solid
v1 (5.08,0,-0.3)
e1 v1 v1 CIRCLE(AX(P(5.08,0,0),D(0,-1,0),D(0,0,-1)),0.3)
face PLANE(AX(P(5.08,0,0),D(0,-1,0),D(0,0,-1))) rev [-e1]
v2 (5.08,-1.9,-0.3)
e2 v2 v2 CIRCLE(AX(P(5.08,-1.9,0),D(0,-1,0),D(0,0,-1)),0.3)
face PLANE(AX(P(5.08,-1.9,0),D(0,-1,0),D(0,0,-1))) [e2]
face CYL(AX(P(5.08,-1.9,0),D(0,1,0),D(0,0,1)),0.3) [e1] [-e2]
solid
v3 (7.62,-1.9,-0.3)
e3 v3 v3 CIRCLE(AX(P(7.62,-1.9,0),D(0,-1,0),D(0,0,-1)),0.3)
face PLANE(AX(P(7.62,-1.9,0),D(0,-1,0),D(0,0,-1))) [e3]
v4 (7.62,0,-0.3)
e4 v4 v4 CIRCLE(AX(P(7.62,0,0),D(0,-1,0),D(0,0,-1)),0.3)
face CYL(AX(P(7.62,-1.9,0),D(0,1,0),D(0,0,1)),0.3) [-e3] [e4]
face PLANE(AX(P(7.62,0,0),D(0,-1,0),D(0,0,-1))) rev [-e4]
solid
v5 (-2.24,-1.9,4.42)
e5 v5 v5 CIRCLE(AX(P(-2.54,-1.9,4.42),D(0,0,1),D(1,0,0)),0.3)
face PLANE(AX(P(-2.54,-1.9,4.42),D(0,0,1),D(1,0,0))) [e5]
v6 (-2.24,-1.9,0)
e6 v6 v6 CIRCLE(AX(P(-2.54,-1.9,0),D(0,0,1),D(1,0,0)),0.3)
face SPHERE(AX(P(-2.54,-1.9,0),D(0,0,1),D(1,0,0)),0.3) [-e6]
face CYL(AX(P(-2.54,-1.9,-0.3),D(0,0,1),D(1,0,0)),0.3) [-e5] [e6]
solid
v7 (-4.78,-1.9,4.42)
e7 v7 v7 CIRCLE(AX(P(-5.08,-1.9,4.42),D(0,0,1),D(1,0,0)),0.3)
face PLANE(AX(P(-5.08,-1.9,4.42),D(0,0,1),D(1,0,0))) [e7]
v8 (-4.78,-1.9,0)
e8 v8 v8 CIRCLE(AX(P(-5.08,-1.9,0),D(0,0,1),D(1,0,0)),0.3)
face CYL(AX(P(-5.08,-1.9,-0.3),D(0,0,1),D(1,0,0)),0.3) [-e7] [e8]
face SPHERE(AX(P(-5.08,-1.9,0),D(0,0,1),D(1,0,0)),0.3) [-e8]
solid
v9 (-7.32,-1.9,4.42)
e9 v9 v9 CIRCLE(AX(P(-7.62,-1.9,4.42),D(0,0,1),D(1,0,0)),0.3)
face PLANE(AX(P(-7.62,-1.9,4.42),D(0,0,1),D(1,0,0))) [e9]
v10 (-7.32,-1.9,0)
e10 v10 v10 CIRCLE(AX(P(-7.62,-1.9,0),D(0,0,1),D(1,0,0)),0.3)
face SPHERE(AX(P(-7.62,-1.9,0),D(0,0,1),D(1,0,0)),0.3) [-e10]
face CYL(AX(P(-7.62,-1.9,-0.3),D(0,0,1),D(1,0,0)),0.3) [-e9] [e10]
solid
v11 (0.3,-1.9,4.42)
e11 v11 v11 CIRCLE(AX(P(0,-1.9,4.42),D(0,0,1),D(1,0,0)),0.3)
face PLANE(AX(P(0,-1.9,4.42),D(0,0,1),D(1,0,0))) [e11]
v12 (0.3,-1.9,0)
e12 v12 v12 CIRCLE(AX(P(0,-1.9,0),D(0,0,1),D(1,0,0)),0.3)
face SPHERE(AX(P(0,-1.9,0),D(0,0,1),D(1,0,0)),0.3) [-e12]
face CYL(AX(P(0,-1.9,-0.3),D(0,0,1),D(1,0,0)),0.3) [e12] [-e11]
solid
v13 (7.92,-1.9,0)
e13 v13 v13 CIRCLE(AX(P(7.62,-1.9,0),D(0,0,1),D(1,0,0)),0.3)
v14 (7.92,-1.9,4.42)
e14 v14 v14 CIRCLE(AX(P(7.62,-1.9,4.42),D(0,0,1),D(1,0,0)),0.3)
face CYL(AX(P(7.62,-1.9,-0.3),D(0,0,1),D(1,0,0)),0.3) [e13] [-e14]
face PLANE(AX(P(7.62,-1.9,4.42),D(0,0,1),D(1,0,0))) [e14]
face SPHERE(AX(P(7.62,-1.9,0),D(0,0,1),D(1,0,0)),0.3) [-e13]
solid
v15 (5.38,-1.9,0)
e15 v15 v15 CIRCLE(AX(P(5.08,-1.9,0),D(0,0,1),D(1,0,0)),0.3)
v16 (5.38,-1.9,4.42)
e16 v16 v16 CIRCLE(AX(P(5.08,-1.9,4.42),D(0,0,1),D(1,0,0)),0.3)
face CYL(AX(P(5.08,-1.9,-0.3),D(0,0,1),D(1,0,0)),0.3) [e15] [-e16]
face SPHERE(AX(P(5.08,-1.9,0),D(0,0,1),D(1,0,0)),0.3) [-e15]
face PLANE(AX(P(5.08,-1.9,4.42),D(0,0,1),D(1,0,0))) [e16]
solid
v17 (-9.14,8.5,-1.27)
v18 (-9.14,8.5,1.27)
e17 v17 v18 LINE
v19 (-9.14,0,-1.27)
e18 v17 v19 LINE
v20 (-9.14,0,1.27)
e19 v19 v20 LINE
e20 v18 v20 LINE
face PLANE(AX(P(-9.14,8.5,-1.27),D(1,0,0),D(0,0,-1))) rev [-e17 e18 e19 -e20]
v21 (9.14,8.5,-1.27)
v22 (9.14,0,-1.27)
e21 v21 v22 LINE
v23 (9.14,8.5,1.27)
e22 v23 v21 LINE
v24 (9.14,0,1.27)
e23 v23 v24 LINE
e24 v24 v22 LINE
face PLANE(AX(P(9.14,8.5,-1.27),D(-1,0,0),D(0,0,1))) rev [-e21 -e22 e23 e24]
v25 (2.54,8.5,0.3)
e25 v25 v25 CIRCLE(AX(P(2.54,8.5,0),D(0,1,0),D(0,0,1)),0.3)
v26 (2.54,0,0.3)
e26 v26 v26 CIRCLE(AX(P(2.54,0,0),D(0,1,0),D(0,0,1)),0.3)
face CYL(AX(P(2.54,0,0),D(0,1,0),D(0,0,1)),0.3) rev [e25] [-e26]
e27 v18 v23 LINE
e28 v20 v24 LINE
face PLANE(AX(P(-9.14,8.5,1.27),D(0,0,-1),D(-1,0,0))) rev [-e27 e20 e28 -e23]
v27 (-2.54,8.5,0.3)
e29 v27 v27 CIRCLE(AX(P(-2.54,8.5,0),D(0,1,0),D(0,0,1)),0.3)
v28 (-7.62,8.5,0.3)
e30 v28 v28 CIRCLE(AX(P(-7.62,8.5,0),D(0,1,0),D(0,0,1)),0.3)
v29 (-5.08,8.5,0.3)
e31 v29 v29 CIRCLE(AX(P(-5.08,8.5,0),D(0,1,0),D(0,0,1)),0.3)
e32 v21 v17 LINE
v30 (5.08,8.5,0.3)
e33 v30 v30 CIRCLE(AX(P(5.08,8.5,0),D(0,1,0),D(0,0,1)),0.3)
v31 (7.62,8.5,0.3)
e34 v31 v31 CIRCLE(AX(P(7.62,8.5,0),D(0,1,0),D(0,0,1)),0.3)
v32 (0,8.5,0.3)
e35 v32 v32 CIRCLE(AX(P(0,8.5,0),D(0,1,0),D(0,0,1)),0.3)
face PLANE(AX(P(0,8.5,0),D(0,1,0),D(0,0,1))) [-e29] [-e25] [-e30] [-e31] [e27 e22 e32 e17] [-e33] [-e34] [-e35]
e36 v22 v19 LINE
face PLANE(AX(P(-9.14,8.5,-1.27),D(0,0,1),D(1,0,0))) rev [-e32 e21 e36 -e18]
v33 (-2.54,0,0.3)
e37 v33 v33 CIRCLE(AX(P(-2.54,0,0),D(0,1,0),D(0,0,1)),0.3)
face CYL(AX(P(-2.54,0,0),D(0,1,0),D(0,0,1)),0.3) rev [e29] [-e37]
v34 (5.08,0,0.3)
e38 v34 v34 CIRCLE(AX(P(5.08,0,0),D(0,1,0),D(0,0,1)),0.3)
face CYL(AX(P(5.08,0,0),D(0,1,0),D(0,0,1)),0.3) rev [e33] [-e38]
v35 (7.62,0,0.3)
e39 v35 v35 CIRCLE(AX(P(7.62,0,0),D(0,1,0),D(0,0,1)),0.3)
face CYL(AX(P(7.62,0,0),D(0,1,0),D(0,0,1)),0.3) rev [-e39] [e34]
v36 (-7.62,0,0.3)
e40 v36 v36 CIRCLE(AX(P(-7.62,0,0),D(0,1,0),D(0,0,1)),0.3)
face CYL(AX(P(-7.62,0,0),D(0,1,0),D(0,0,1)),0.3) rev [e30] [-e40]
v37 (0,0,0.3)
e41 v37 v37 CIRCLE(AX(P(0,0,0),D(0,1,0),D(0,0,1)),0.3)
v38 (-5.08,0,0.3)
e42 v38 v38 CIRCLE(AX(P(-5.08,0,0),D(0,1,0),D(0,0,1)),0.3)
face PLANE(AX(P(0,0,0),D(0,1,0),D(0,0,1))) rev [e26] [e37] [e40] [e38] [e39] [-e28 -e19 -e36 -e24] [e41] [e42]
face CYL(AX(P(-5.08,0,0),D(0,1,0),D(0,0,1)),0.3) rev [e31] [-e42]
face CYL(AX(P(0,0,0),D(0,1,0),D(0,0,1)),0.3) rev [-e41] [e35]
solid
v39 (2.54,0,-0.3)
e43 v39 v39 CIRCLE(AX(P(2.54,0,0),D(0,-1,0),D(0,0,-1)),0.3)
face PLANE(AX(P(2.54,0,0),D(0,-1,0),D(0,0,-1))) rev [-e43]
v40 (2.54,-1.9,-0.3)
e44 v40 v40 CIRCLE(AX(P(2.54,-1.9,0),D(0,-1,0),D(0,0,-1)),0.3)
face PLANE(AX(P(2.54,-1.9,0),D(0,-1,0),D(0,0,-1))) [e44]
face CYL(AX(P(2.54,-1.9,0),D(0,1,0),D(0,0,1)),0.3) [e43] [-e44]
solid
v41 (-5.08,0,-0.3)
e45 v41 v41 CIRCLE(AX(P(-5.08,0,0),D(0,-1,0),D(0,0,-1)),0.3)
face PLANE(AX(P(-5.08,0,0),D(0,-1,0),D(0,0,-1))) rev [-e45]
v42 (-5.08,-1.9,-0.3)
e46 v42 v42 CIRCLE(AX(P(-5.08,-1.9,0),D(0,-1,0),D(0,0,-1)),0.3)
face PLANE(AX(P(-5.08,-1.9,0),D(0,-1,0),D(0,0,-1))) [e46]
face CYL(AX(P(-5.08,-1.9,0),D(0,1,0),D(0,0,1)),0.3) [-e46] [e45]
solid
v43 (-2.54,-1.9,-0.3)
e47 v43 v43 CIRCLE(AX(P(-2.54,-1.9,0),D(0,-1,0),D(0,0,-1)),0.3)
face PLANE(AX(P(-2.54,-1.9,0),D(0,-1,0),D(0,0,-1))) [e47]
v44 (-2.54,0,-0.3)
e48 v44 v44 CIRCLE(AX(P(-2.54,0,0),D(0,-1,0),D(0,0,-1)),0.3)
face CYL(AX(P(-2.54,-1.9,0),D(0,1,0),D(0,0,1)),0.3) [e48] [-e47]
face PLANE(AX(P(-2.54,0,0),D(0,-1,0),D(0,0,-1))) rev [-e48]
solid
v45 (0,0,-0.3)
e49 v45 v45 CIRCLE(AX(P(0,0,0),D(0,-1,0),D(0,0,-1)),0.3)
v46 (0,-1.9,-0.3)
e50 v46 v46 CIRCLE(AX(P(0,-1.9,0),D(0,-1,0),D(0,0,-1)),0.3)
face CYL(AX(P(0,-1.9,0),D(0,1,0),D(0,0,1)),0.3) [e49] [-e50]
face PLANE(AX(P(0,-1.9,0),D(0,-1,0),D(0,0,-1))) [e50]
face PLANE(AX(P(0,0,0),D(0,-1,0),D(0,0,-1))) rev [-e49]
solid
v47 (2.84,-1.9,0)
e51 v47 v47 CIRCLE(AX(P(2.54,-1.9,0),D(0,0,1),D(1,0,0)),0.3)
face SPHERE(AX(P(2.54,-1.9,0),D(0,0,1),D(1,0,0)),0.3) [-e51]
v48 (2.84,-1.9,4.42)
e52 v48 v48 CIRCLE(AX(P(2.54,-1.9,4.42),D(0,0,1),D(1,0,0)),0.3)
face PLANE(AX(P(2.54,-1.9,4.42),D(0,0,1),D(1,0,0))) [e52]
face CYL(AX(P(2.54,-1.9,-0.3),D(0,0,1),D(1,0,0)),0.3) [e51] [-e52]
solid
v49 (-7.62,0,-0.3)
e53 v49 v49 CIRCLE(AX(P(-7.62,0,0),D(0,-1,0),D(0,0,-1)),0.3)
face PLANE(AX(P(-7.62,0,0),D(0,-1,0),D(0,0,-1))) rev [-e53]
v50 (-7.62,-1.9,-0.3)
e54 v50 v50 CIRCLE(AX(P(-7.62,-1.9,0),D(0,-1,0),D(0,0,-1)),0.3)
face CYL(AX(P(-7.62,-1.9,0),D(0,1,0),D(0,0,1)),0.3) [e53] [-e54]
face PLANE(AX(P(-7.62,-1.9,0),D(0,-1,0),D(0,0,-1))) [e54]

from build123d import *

# Parameters (mm, degrees)
SKETCH_1_W             = 18.28
SKETCH_1_H             = 2.54
EXTRUDE_1_DEPTH        = 8.5
SKETCH_2_R             = 0.3
CUT_EXTRUDE_1_DEPTH    = 8.5
SKETCH_3_R             = 0.3
EXTRUDE_2_DEPTH        = 1.9
EXTRUDE_2_2_DEPTH      = 1.9
EXTRUDE_2_3_DEPTH      = 1.9
EXTRUDE_2_4_DEPTH      = 1.9
EXTRUDE_2_5_DEPTH      = 1.9
EXTRUDE_2_6_DEPTH      = 1.9
EXTRUDE_2_7_DEPTH      = 1.9
EXTRUDE_3_DEPTH        = 4.42
EXTRUDE_3_DEPTH_BACK   = 0.3
SKETCH_4_R             = 0.3
EXTRUDE_3_2_DEPTH      = 4.42
EXTRUDE_3_2_DEPTH_BACK = 0.3
EXTRUDE_3_3_DEPTH      = 4.42
EXTRUDE_3_3_DEPTH_BACK = 0.3
EXTRUDE_3_4_DEPTH      = 4.42
EXTRUDE_3_4_DEPTH_BACK = 0.3
EXTRUDE_3_5_DEPTH      = 4.42
EXTRUDE_3_5_DEPTH_BACK = 0.3
EXTRUDE_3_6_DEPTH      = 4.42
EXTRUDE_3_6_DEPTH_BACK = 0.3
EXTRUDE_3_7_DEPTH      = 4.42
EXTRUDE_3_7_DEPTH_BACK = 0.3
FILLET_2_R             = 0.3
FILLET_3_R             = 0.3
FILLET_4_R             = 0.3
FILLET_5_R             = 0.3
FILLET_6_R             = 0.3
FILLET_7_R             = 0.3
FILLET_8_R             = 0.3


with BuildPart() as part:
    # Эскиз1 → Бобышка-Вытянуть1 (new body)
    with BuildSketch(Plane(origin=(0, 0, 0), x_dir=(1, 0, 0), z_dir=(0, 1, 0))):
        Rectangle(SKETCH_1_W, SKETCH_1_H)
    extrude(amount=EXTRUDE_1_DEPTH)

    # Эскиз2 → Вырез-Вытянуть1 (cut)
    with BuildSketch(Plane(origin=(0, 8.5, 0), x_dir=(1, 0, 0), z_dir=(0, 1, 0))):
        with Locations(Location((-7.62, 0, 0), (0, 0, 270))):
            Circle(SKETCH_2_R)
        with Locations(Location((-5.08, 0, 0), (0, 0, 270))):
            Circle(SKETCH_2_R)
        with Locations(Location((-2.54, 0, 0), (0, 0, 270))):
            Circle(SKETCH_2_R)
        with Locations(Location((0, 0, 0), (0, 0, 270))):
            Circle(SKETCH_2_R)
        with Locations(Location((2.54, 0, 0), (0, 0, 270))):
            Circle(SKETCH_2_R)
        with Locations(Location((5.08, 0, 0), (0, 0, 270))):
            Circle(SKETCH_2_R)
        with Locations(Location((7.62, 0, 0), (0, 0, 270))):
            Circle(SKETCH_2_R)
    extrude(amount=-CUT_EXTRUDE_1_DEPTH, mode=Mode.SUBTRACT)


with BuildPart() as body_2:
    # Эскиз3 → Бобышка-Вытянуть2 (new body)
    with BuildSketch(Plane.XZ):
        with Locations(Location((-7.62, 0, 0), (0, 0, 270))):
            Circle(SKETCH_3_R)
    extrude(amount=EXTRUDE_2_DEPTH)


with BuildPart() as body_3:
    # Эскиз3 → Extrude 2 2 (new body)
    with BuildSketch(Plane.XZ):
        with Locations(Location((-5.08, 0, 0), (0, 0, 270))):
            Circle(SKETCH_3_R)
    extrude(amount=EXTRUDE_2_2_DEPTH)


with BuildPart() as body_4:
    # Эскиз3 → Extrude 2 3 (new body)
    with BuildSketch(Plane.XZ):
        with Locations(Location((-2.54, 0, 0), (0, 0, 270))):
            Circle(SKETCH_3_R)
    extrude(amount=EXTRUDE_2_3_DEPTH)


with BuildPart() as body_5:
    # Эскиз3 → Extrude 2 4 (new body)
    with BuildSketch(Plane.XZ):
        with Locations(Location((0, 0, 0), (0, 0, 270))):
            Circle(SKETCH_3_R)
    extrude(amount=EXTRUDE_2_4_DEPTH)


with BuildPart() as body_6:
    # Эскиз3 → Extrude 2 5 (new body)
    with BuildSketch(Plane.XZ):
        with Locations(Location((2.54, 0, 0), (0, 0, 270))):
            Circle(SKETCH_3_R)
    extrude(amount=EXTRUDE_2_5_DEPTH)


with BuildPart() as body_7:
    # Эскиз3 → Extrude 2 6 (new body)
    with BuildSketch(Plane.XZ):
        with Locations(Location((5.08, 0, 0), (0, 0, 270))):
            Circle(SKETCH_3_R)
    extrude(amount=EXTRUDE_2_6_DEPTH)


with BuildPart() as body_8:
    # Эскиз3 → Extrude 2 7 (new body)
    with BuildSketch(Plane.XZ):
        with Locations(Location((7.62, 0, 0), (0, 0, 270))):
            Circle(SKETCH_3_R)
    extrude(amount=EXTRUDE_2_7_DEPTH)


with BuildPart() as body_9:
    # Эскиз4 → Бобышка-Вытянуть3 (new, two sides: drawn at the far end of the back side and taken through both)
    with BuildSketch(Plane.XY.offset(-EXTRUDE_3_DEPTH_BACK)):
        with Locations((-7.62, -1.9)):
            Circle(SKETCH_4_R)
    extrude(amount=EXTRUDE_3_DEPTH + EXTRUDE_3_DEPTH_BACK)

    # Скругление2
    fillet_2_edges = [body_9.edges().sort_by_distance(p)[0] for p in [
        (-7.92, -1.9, -0.3),
    ]]
    fillet(fillet_2_edges, radius=FILLET_2_R - 0.0001)  # a hair under: the kernel refuses the full size


with BuildPart() as body_10:
    # Эскиз4 → Extrude 3 2 (new, two sides: drawn at the far end of the back side and taken through both)
    with BuildSketch(Plane.XY.offset(-EXTRUDE_3_2_DEPTH_BACK)):
        with Locations((-5.08, -1.9)):
            Circle(SKETCH_4_R)
    extrude(amount=EXTRUDE_3_2_DEPTH + EXTRUDE_3_2_DEPTH_BACK)

    # Скругление3
    fillet_3_edges = [body_10.edges().sort_by_distance(p)[0] for p in [
        (-5.38, -1.9, -0.3),
    ]]
    fillet(fillet_3_edges, radius=FILLET_3_R - 0.0001)  # a hair under: the kernel refuses the full size


with BuildPart() as body_11:
    # Эскиз4 → Extrude 3 3 (new, two sides: drawn at the far end of the back side and taken through both)
    with BuildSketch(Plane.XY.offset(-EXTRUDE_3_3_DEPTH_BACK)):
        with Locations((-2.54, -1.9)):
            Circle(SKETCH_4_R)
    extrude(amount=EXTRUDE_3_3_DEPTH + EXTRUDE_3_3_DEPTH_BACK)

    # Скругление4
    fillet_4_edges = [body_11.edges().sort_by_distance(p)[0] for p in [
        (-2.84, -1.9, -0.3),
    ]]
    fillet(fillet_4_edges, radius=FILLET_4_R - 0.0001)  # a hair under: the kernel refuses the full size


with BuildPart() as body_12:
    # Эскиз4 → Extrude 3 4 (new, two sides: drawn at the far end of the back side and taken through both)
    with BuildSketch(Plane.XY.offset(-EXTRUDE_3_4_DEPTH_BACK)):
        with Locations((0, -1.9)):
            Circle(SKETCH_4_R)
    extrude(amount=EXTRUDE_3_4_DEPTH + EXTRUDE_3_4_DEPTH_BACK)

    # Скругление5
    fillet_5_edges = [body_12.edges().sort_by_distance(p)[0] for p in [
        (-0.3, -1.9, -0.3),
    ]]
    fillet(fillet_5_edges, radius=FILLET_5_R - 0.0001)  # a hair under: the kernel refuses the full size


with BuildPart() as body_13:
    # Эскиз4 → Extrude 3 5 (new, two sides: drawn at the far end of the back side and taken through both)
    with BuildSketch(Plane.XY.offset(-EXTRUDE_3_5_DEPTH_BACK)):
        with Locations((2.54, -1.9)):
            Circle(SKETCH_4_R)
    extrude(amount=EXTRUDE_3_5_DEPTH + EXTRUDE_3_5_DEPTH_BACK)

    # Скругление6
    fillet_6_edges = [body_13.edges().sort_by_distance(p)[0] for p in [
        (2.24, -1.9, -0.3),
    ]]
    fillet(fillet_6_edges, radius=FILLET_6_R - 0.0001)  # a hair under: the kernel refuses the full size


with BuildPart() as body_14:
    # Эскиз4 → Extrude 3 6 (new, two sides: drawn at the far end of the back side and taken through both)
    with BuildSketch(Plane.XY.offset(-EXTRUDE_3_6_DEPTH_BACK)):
        with Locations((5.08, -1.9)):
            Circle(SKETCH_4_R)
    extrude(amount=EXTRUDE_3_6_DEPTH + EXTRUDE_3_6_DEPTH_BACK)

    # Скругление7
    fillet_7_edges = [body_14.edges().sort_by_distance(p)[0] for p in [
        (4.78, -1.9, -0.3),
    ]]
    fillet(fillet_7_edges, radius=FILLET_7_R - 0.0001)  # a hair under: the kernel refuses the full size


with BuildPart() as body_15:
    # Эскиз4 → Extrude 3 7 (new, two sides: drawn at the far end of the back side and taken through both)
    with BuildSketch(Plane.XY.offset(-EXTRUDE_3_7_DEPTH_BACK)):
        with Locations((7.62, -1.9)):
            Circle(SKETCH_4_R)
    extrude(amount=EXTRUDE_3_7_DEPTH + EXTRUDE_3_7_DEPTH_BACK)

    # Скругление8
    fillet_8_edges = [body_15.edges().sort_by_distance(p)[0] for p in [
        (7.32, -1.9, -0.3),
    ]]
    fillet(fillet_8_edges, radius=FILLET_8_R - 0.0001)  # a hair under: the kernel refuses the full size


solid = Compound([part.part, body_2.part, body_3.part, body_4.part, body_5.part, body_6.part, body_7.part, body_8.part, body_9.part, body_10.part, body_11.part, body_12.part, body_13.part, body_14.part, body_15.part])
